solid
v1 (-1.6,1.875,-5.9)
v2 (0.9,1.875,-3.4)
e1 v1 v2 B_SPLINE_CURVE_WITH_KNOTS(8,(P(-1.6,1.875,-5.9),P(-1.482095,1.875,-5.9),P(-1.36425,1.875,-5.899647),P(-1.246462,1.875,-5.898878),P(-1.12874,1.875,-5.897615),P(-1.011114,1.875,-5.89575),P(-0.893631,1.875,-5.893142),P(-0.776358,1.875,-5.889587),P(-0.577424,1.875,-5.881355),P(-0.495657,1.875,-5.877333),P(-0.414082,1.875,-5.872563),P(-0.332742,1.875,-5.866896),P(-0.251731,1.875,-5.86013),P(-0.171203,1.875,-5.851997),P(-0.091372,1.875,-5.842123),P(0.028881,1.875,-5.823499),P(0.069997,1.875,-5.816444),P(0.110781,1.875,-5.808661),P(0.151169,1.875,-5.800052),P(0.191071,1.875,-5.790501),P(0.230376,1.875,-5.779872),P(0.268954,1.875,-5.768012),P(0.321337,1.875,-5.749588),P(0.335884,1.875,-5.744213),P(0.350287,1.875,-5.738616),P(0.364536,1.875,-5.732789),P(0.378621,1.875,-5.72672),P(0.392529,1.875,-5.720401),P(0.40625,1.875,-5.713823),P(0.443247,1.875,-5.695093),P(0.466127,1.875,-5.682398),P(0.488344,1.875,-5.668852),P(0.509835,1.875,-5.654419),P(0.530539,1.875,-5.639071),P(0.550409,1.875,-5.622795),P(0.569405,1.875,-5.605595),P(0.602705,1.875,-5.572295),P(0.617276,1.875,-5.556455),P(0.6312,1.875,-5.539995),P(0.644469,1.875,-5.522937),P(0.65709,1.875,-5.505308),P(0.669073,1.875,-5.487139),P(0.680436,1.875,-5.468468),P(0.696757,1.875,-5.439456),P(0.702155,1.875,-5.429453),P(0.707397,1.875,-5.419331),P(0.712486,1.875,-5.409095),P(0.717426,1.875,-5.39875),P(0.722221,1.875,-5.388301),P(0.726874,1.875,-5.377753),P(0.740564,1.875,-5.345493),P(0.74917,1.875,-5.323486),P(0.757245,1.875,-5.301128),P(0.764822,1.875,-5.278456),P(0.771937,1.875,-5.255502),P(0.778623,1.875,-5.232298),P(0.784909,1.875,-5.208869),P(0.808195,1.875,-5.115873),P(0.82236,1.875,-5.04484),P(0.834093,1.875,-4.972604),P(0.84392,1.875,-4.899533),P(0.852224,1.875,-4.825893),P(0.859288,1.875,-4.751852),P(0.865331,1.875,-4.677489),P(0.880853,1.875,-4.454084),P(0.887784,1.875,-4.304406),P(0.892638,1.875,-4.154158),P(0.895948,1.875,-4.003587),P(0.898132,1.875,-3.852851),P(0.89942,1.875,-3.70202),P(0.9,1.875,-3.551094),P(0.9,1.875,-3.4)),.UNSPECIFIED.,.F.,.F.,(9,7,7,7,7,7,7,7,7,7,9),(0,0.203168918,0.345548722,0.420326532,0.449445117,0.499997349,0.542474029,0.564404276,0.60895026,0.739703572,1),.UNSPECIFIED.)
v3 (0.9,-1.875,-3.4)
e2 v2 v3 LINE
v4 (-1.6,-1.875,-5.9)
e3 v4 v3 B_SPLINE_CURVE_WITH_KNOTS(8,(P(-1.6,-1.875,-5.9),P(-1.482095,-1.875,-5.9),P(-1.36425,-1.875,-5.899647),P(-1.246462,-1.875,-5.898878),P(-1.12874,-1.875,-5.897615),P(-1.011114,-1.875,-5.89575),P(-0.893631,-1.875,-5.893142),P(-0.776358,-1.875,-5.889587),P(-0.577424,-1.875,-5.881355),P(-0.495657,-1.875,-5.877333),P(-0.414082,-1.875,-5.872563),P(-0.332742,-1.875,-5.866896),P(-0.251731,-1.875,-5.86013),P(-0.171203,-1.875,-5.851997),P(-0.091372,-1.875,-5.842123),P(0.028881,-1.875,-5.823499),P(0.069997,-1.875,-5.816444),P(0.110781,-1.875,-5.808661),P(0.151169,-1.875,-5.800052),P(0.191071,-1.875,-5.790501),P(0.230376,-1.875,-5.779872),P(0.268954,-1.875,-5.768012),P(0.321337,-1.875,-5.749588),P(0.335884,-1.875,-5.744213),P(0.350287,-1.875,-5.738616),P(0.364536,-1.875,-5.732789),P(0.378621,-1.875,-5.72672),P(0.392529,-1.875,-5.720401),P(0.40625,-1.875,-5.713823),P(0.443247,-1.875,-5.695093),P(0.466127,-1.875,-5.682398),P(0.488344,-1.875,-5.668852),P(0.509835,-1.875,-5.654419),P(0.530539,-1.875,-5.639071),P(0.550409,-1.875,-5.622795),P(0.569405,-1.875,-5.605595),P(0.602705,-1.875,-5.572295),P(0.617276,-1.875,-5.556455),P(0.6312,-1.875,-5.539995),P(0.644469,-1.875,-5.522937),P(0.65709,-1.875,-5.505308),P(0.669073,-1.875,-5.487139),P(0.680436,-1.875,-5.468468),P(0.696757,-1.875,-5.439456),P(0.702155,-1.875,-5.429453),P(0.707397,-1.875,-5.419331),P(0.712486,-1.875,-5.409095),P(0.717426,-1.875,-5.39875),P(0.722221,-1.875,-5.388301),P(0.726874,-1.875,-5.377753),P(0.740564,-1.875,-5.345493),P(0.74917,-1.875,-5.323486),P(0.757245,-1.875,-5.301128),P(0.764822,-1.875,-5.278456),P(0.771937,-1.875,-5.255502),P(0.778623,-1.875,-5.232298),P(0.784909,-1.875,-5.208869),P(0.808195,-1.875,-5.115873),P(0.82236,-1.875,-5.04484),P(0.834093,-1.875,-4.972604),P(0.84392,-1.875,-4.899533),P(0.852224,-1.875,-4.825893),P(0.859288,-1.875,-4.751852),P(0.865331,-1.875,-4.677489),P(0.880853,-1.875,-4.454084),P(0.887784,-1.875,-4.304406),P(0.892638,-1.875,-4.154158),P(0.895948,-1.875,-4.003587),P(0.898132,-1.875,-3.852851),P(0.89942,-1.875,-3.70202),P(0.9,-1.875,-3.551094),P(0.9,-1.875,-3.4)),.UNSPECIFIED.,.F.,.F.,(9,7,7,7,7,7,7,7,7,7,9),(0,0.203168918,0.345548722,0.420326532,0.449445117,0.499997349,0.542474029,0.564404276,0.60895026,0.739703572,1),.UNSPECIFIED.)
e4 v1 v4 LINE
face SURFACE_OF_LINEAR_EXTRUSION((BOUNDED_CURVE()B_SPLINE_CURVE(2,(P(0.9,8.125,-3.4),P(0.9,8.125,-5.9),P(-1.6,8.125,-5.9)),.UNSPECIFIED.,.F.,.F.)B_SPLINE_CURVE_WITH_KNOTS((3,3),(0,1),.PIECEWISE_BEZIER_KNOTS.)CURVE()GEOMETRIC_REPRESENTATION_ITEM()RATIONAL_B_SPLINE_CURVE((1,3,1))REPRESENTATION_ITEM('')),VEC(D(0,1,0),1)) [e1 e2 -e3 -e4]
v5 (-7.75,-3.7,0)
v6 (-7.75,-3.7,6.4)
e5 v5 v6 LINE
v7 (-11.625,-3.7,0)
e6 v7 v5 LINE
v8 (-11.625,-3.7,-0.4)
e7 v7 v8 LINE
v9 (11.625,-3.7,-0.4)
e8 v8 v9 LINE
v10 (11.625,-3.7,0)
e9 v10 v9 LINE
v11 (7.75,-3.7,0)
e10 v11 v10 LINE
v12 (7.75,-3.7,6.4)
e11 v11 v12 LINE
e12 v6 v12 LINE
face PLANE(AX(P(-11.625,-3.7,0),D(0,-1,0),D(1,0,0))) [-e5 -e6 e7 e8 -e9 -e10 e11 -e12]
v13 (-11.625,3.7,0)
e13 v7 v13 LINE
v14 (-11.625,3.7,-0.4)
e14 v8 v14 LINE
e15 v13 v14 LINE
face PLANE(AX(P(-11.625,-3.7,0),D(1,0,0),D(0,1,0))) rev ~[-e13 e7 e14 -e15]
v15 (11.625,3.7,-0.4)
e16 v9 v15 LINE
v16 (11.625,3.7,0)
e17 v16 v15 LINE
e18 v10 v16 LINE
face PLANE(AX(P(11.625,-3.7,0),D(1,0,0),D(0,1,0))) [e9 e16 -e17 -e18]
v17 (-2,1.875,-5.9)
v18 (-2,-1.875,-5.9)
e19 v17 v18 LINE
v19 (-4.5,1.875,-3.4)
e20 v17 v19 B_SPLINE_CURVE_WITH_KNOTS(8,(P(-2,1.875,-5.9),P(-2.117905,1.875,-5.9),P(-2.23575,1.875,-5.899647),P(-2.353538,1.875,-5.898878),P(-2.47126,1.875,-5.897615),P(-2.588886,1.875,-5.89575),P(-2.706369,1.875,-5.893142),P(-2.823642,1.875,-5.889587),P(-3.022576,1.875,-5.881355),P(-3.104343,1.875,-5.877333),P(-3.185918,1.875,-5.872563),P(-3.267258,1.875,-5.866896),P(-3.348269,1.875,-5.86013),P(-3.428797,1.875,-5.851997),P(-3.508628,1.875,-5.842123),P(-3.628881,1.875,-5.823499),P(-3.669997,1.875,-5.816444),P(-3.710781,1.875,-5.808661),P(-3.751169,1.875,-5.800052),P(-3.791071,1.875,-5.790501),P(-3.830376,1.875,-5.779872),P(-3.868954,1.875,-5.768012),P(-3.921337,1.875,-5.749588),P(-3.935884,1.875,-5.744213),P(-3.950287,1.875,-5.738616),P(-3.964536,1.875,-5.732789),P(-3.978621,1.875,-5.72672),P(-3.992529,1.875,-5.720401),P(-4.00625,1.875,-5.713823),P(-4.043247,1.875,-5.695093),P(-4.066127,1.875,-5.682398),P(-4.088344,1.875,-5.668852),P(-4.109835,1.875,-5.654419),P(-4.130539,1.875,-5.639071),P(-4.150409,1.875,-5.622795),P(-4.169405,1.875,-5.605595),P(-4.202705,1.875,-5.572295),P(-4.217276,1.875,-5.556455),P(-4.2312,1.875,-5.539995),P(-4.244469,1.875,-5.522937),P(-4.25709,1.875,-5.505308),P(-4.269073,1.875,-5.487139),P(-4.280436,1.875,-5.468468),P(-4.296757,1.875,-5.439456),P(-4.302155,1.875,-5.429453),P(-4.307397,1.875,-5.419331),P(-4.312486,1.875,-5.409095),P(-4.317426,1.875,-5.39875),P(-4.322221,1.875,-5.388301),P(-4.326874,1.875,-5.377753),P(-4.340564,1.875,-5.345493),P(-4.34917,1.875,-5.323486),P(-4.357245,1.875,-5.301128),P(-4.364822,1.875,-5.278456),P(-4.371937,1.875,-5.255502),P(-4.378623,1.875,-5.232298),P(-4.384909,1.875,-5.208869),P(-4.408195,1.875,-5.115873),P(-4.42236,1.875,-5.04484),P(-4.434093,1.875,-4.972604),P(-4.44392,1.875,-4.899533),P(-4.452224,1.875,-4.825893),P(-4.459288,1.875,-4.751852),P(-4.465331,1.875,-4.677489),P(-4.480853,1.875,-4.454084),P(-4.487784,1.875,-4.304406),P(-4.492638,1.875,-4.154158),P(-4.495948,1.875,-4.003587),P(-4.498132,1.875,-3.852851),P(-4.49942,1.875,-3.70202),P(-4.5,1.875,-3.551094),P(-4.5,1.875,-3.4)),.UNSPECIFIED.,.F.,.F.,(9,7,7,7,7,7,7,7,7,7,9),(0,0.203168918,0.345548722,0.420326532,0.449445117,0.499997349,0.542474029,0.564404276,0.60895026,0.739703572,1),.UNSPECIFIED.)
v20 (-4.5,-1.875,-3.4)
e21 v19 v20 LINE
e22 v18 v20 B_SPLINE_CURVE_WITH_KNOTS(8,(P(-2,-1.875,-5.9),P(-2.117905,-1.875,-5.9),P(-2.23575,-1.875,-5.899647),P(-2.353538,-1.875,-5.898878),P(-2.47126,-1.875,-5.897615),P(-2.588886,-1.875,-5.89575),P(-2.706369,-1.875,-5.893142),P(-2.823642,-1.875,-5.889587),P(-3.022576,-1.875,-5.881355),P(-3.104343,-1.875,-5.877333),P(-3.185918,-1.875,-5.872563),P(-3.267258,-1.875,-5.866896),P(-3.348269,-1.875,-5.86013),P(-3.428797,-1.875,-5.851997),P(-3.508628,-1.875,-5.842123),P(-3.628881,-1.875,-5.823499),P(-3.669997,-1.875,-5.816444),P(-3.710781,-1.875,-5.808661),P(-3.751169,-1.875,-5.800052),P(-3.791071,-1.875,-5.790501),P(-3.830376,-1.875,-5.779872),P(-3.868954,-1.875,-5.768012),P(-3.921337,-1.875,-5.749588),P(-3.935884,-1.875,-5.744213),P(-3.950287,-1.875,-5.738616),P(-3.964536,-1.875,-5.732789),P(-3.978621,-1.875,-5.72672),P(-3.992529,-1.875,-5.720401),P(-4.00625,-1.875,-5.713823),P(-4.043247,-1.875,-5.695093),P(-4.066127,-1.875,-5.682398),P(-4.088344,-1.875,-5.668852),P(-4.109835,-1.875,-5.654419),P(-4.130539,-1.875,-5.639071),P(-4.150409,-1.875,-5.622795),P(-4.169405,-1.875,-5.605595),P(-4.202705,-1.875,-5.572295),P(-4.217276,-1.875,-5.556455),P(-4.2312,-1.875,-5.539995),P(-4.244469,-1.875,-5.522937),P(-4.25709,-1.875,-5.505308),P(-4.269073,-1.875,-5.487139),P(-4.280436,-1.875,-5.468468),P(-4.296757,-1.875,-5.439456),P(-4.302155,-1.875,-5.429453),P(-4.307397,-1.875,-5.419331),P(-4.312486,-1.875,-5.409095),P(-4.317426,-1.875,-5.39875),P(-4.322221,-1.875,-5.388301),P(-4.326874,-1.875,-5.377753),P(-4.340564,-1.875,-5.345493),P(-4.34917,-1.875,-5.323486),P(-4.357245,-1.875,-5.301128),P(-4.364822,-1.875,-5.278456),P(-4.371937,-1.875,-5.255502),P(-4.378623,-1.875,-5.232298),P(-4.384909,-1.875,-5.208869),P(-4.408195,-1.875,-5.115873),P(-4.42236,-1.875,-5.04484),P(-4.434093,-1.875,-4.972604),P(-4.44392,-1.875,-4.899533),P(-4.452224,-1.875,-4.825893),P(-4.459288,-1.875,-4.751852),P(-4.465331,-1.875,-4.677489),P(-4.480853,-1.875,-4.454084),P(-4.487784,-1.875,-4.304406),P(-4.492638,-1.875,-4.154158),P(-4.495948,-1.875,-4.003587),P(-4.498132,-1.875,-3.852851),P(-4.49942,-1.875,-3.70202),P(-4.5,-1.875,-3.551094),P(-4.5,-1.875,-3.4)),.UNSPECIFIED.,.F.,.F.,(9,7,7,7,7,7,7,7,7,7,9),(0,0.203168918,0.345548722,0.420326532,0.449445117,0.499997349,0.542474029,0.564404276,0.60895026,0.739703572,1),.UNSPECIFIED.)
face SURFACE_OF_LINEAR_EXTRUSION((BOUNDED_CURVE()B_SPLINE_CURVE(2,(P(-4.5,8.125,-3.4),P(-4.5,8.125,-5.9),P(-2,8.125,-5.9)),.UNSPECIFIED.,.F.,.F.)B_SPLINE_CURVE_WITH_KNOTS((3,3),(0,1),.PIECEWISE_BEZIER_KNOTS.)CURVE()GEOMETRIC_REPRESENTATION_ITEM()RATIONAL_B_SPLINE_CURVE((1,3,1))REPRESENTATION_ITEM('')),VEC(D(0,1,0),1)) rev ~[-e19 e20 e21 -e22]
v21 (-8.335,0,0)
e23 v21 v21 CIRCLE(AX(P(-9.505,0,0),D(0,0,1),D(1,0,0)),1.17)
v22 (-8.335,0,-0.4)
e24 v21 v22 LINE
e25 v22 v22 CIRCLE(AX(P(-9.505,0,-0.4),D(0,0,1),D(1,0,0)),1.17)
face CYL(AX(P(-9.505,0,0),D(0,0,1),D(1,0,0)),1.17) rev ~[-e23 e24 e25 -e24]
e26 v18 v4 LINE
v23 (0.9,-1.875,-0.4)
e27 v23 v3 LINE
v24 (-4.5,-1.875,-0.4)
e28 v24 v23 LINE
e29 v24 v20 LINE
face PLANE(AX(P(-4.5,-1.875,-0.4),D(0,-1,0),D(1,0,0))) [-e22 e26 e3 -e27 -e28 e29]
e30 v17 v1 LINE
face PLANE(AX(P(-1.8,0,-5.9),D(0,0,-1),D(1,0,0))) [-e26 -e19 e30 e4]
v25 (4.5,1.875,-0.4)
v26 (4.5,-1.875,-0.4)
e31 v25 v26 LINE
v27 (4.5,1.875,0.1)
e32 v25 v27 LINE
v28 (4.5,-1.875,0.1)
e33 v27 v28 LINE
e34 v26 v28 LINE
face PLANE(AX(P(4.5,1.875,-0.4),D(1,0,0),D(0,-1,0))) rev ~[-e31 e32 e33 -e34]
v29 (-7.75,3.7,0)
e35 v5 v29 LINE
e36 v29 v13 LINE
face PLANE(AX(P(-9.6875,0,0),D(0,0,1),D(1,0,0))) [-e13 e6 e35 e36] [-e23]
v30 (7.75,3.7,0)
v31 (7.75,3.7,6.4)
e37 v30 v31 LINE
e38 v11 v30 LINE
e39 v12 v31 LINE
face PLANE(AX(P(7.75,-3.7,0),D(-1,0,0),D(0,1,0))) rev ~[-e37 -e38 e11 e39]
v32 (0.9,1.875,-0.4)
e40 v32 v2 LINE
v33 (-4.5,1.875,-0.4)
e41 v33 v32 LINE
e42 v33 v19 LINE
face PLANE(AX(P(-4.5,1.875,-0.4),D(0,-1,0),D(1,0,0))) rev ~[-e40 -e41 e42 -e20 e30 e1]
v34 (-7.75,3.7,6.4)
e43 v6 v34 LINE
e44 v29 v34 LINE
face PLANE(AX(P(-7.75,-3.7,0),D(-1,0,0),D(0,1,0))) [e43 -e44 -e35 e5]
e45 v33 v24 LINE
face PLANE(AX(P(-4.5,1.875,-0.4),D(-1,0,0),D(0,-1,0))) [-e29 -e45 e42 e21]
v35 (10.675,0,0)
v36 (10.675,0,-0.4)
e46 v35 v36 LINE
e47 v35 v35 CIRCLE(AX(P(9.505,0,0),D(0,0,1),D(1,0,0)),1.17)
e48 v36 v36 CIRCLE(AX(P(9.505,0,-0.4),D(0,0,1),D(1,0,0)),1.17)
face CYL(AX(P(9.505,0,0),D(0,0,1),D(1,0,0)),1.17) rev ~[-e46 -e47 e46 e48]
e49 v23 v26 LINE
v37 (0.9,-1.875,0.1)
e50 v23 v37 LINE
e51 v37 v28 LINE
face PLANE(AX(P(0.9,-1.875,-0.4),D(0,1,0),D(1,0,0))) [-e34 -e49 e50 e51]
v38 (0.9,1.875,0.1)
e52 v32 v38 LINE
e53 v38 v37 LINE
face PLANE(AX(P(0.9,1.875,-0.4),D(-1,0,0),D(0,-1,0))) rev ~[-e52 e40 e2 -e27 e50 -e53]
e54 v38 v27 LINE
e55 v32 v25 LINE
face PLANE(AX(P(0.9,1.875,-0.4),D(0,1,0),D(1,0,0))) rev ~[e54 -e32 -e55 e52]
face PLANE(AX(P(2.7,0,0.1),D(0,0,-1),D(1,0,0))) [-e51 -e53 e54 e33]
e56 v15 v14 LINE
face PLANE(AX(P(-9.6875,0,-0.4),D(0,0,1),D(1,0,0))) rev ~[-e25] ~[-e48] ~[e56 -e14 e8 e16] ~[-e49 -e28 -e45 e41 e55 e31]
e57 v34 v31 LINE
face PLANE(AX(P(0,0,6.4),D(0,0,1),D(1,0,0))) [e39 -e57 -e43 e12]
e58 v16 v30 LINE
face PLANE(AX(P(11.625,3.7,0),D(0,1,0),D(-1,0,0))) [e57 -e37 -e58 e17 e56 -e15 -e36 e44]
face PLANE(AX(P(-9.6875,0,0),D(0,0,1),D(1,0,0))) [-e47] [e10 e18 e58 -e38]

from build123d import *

# Parameters (mm, degrees)
F0_W        = 3.875
F0_H        = 7.4
F0_R        = 1.17
F0_W_2      = 15.5
F1_DEPTH    = 0.4
F2_DEPTH    = 6.4
F3_W        = 3.6
F3_H        = 3.75
F4_DEPTH    = 0.5
F3_W_2      = 5.4
F5_DEPTH    = 5.5
F6_T1_DEPTH = 16.25
F7_DEPTH    = 0.5


# Not quite as in the source:
# - a fillet or chamfer that OpenCascade refuses, or shapes differently, is made with other operations: its cross-section is extruded or revolved along the edge and cut away or added


with BuildPart() as f1:
    # F0 (on Top) → F1 (new body)
    with BuildSketch(Plane.XY):
        with Locations((-9.6875, 0)):
            Rectangle(F0_W, F0_H)
        with Locations((-9.505, 0)):
            Circle(F0_R, mode=Mode.SUBTRACT)
        Rectangle(F0_W_2, F0_H)
        with Locations((9.6875, 0)):
            Rectangle(F0_W, F0_H)
        with Locations((9.505, 0)):
            Circle(F0_R, mode=Mode.SUBTRACT)
    extrude(amount=-F1_DEPTH)

    # F0 (on Top) → F2 (join)
    with BuildSketch(Plane.XY):
        Rectangle(F0_W_2, F0_H)
    extrude(amount=F2_DEPTH)

    # F3 (on face) → F4 (cut)
    with BuildSketch(Plane(origin=(0, 0, -0.4), x_dir=(1, 0, 0), z_dir=(0, 0, -1))):
        with Locations((2.7, 0)):
            Rectangle(F3_W, F3_H)
    extrude(amount=-F4_DEPTH, mode=Mode.SUBTRACT)

    # F3 (on face) → F5 (join)
    with BuildSketch(Plane(origin=(0, 0, -0.4), x_dir=(1, 0, 0), z_dir=(0, 0, -1))):
        with Locations((-1.8, 0)):
            Rectangle(F3_W_2, F3_H)
    extrude(amount=F5_DEPTH)

    # F6: fillet of radius 2.5 on 2 edges, made by hand

    # F6_s2 → F6_t1 (cut)
    with BuildSketch(Plane.XZ.offset(-8.125)):
        with BuildLine():
            add(Edge.make_bspline(
                [(-4.5, -3.4), (-4.5, -5.9), (-2, -5.9)],
                knots=[0, 0, 0, 1, 1, 1], degree=2, weights=[1, 3, 1]))
            Line((-2, -5.9), (-4.5, -5.9))
            Line((-4.5, -5.9), (-4.5, -3.4))
        make_face()
        with BuildLine():
            add(Edge.make_bspline(
                [(0.9, -3.4), (0.9, -5.9), (-1.6, -5.9)],
                knots=[0, 0, 0, 1, 1, 1], degree=2, weights=[1, 3, 1]))
            Line((-1.6, -5.9), (0.9, -5.9))
            Line((0.9, -5.9), (0.9, -3.4))
        make_face()
    extrude(amount=F6_T1_DEPTH, mode=Mode.SUBTRACT)

    # F3 (on face) → F7 (cut)
    with BuildSketch(Plane(origin=(0, 0, -0.4), x_dir=(1, 0, 0), z_dir=(0, 0, -1))):
        with Locations((2.7, 0)):
            Rectangle(F3_W, F3_H)
    extrude(amount=-F7_DEPTH, mode=Mode.SUBTRACT)


solid = f1.part
